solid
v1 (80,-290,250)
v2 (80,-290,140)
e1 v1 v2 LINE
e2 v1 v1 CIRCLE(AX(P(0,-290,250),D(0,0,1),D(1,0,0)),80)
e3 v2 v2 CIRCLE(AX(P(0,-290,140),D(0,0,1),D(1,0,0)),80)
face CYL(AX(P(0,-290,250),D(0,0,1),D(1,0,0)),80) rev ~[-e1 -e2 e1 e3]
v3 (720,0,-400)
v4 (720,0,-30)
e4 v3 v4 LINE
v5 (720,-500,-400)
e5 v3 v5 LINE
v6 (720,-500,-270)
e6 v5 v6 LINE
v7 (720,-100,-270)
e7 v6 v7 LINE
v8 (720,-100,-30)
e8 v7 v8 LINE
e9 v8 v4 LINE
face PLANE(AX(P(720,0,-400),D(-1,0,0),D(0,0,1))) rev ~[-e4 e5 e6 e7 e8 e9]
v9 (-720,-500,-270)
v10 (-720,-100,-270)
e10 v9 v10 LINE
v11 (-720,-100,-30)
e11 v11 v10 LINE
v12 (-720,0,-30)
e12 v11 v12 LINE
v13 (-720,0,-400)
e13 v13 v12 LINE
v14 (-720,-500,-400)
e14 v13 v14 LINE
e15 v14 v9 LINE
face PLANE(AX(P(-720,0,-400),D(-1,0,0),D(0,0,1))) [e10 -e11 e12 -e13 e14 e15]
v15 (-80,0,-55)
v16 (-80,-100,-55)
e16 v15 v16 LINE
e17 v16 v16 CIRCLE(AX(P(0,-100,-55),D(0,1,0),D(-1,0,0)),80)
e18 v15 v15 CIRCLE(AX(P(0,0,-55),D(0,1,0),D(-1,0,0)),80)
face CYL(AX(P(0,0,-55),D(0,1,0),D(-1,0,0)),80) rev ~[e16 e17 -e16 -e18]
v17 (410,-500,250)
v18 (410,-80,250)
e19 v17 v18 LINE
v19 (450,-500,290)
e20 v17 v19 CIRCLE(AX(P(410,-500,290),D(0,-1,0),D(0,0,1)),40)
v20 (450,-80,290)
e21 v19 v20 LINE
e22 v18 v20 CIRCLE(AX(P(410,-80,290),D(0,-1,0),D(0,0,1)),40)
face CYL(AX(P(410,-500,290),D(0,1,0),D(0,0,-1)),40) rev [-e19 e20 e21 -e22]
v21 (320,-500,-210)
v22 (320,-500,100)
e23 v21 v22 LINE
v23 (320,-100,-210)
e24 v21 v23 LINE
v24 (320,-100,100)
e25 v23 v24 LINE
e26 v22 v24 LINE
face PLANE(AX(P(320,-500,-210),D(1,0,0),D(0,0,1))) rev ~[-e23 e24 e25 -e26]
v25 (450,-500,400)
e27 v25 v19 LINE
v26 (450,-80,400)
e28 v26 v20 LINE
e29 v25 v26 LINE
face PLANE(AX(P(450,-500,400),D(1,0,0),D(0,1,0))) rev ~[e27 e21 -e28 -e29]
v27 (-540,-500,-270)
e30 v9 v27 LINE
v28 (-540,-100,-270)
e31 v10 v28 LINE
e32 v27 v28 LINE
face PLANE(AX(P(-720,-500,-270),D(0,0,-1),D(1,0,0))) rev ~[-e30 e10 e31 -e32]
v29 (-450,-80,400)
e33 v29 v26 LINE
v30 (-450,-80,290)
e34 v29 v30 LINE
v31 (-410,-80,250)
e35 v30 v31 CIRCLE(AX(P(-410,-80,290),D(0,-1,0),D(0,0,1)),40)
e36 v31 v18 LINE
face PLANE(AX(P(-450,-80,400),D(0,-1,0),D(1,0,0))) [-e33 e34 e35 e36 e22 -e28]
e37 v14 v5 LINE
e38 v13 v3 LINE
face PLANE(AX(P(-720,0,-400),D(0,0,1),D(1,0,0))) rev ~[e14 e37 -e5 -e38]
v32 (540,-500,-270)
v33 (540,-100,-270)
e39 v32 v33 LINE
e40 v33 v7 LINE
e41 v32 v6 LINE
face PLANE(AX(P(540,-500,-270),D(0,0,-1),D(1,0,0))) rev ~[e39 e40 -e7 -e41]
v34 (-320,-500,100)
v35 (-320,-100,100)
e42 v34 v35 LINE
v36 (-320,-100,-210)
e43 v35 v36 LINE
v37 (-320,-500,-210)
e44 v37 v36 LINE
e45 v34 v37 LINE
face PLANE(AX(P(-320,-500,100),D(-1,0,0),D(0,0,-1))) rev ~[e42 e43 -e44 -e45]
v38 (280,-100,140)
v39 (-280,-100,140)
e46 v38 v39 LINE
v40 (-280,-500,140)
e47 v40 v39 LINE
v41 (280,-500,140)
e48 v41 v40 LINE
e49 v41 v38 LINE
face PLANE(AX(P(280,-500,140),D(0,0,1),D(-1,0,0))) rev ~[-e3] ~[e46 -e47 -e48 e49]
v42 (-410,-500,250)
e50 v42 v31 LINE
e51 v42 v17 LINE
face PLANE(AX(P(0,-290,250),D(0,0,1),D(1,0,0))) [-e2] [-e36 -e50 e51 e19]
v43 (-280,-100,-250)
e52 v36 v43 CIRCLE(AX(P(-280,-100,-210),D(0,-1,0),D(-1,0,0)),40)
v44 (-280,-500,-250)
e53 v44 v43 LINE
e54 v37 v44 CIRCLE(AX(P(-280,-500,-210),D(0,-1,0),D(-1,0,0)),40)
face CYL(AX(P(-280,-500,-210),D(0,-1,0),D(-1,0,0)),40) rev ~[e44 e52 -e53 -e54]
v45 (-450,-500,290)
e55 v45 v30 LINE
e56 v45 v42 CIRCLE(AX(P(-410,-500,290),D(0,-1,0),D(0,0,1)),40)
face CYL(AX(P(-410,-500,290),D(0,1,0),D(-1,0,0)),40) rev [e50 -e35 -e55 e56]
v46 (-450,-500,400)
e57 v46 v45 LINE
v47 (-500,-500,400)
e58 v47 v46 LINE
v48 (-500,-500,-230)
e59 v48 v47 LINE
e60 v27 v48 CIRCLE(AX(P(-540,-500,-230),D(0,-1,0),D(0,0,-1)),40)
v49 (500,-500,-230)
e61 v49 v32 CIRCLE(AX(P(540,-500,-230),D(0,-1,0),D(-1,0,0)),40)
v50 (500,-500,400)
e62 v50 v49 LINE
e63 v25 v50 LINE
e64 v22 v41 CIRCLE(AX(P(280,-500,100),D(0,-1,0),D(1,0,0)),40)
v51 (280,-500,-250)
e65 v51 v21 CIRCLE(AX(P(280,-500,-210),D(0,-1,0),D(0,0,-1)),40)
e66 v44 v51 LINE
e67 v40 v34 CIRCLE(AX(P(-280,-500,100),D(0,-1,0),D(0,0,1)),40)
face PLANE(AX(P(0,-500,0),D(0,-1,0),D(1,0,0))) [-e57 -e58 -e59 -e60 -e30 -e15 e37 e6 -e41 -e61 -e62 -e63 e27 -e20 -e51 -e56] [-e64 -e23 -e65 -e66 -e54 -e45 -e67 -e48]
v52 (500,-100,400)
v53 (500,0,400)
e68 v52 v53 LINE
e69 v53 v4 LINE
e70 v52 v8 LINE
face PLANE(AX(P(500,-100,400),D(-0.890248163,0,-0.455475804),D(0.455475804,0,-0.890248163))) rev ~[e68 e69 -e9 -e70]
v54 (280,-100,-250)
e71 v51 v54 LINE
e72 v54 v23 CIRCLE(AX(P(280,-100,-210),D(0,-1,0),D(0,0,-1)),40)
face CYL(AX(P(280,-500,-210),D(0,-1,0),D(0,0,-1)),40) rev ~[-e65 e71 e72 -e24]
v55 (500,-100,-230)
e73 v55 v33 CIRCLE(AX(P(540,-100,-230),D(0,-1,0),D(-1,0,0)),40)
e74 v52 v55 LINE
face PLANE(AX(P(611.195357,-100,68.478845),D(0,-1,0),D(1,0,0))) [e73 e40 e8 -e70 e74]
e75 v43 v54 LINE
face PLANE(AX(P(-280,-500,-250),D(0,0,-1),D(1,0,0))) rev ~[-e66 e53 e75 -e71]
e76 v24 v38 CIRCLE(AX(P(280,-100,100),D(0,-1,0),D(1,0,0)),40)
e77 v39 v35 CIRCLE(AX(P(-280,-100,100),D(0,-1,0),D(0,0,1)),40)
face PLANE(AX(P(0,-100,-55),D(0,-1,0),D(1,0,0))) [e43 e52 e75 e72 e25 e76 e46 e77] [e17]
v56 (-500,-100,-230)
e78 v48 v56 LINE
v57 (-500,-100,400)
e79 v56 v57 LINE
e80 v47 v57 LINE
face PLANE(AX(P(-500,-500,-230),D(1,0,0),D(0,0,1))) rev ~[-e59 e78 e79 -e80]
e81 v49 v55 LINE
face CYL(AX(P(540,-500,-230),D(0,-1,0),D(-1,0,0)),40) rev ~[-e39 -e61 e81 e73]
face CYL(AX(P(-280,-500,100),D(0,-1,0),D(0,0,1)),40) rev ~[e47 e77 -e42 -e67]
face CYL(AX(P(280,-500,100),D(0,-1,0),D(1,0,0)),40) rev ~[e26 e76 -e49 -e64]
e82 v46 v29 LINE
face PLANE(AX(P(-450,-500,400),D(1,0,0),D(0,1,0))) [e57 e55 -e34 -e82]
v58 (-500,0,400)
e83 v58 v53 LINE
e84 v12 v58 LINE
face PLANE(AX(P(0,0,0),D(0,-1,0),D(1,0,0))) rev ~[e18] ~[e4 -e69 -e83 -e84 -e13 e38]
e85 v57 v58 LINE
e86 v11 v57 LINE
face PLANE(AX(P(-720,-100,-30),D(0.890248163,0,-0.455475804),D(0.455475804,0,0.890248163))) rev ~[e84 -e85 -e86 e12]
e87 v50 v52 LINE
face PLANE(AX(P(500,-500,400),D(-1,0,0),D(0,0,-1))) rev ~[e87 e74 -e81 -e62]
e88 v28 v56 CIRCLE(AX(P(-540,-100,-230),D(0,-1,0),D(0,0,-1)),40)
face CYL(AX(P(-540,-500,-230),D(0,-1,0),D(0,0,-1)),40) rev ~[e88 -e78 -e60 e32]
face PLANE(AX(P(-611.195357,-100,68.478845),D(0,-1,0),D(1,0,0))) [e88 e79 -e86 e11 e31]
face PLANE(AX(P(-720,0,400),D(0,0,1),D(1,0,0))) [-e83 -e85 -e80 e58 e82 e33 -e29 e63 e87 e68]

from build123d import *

# Parameters (mm, degrees)
F0_W      = 1440
F0_H      = 800
F1_DEPTH  = 500
F3_DEPTH  = 400
F5_DEPTH  = 400
F7_DEPTH  = 100.001
F9_DEPTH  = 100.001
F10_W     = 900
F10_H     = 420
F11_DEPTH = 150
F12_R     = 40
F13_R     = 80
F14_DEPTH = 150
F15_R     = 80
F16_DEPTH = 500.001


with BuildPart() as f1:
    # F0 (on Front) → F1 (new body)
    with BuildSketch(Plane.XZ):
        Rectangle(F0_W, F0_H)
    extrude(amount=F1_DEPTH)

    # F2 (on face) → F3 (cut)
    with BuildSketch(Plane.XZ.offset(500)):
        with BuildLine():
            Line((280, 140), (-280, 140))
            ThreePointArc((-280, 140), (-308.2842712475, 128.2842712475), (-320, 100))
            Line((-320, 100), (-320, -210))
            ThreePointArc((-320, -210), (-308.2842712475, -238.2842712475), (-280, -250))
            Line((-280, -250), (280, -250))
            ThreePointArc((280, -250), (308.2842712475, -238.2842712475), (320, -210))
            Line((320, -210), (320, 100))
            ThreePointArc((320, 100), (308.2842712475, 128.2842712475), (280, 140))
        make_face()
    extrude(amount=-F3_DEPTH, mode=Mode.SUBTRACT)

    # F4 (on face) → F5 (cut)
    with BuildSketch(Plane.XZ.offset(500)):
        with BuildLine():
            Line((-720, 400), (-720, -270))
            Line((-720, -270), (-540, -270))
            ThreePointArc((-540, -270), (-511.7157287525, -258.2842712475), (-500, -230))
            Line((-500, -230), (-500, 400))
            Line((-500, 400), (-720, 400))
        make_face()
        with BuildLine():
            Line((720, 400), (500, 400))
            Line((500, 400), (500, -230))
            ThreePointArc((500, -230), (511.7157287525, -258.2842712475), (540, -270))
            Line((540, -270), (720, -270))
            Line((720, -270), (720, 400))
        make_face()
    extrude(amount=-F5_DEPTH, mode=Mode.SUBTRACT)

    # F6 (on face) → F7 (cut, through all)
    with BuildSketch(Plane.XZ.offset(100)):
        Polygon((500, 400), (720, -30), (720, 400), align=None)
    extrude(amount=-F7_DEPTH, mode=Mode.SUBTRACT)

    # F8 (on face) → F9 (cut, through all)
    with BuildSketch(Plane.XZ.offset(100)):
        Polygon((-720, 400), (-720, -30), (-500, 400), align=None)
    extrude(amount=-F9_DEPTH, mode=Mode.SUBTRACT)

    # F10 (on face) → F11 (cut)
    with BuildSketch(Plane.XY.offset(400)):
        with Locations((0, -290)):
            Rectangle(F10_W, F10_H)
    extrude(amount=-F11_DEPTH, mode=Mode.SUBTRACT)

    # F12
    f12_edges = [f1.edges().sort_by_distance(p)[0] for p in [
        (-450, -290, 250),
        (450, -290, 250),
    ]]
    fillet(f12_edges, radius=F12_R)

    # F13 (on face) → F14 (cut)
    with BuildSketch(Plane.XY.offset(250)):
        with Locations((0, -290)):
            Circle(F13_R)
    extrude(amount=-F14_DEPTH, mode=Mode.SUBTRACT)

    # F15 (on face) → F16 (cut, through all)
    with BuildSketch(Plane(origin=(0, 0, 0), x_dir=(-1, 0, 0), z_dir=(0, 1, 0))):
        with Locations((0, -55)):
            Circle(F15_R)
    extrude(amount=-F16_DEPTH, mode=Mode.SUBTRACT)


solid = f1.part
